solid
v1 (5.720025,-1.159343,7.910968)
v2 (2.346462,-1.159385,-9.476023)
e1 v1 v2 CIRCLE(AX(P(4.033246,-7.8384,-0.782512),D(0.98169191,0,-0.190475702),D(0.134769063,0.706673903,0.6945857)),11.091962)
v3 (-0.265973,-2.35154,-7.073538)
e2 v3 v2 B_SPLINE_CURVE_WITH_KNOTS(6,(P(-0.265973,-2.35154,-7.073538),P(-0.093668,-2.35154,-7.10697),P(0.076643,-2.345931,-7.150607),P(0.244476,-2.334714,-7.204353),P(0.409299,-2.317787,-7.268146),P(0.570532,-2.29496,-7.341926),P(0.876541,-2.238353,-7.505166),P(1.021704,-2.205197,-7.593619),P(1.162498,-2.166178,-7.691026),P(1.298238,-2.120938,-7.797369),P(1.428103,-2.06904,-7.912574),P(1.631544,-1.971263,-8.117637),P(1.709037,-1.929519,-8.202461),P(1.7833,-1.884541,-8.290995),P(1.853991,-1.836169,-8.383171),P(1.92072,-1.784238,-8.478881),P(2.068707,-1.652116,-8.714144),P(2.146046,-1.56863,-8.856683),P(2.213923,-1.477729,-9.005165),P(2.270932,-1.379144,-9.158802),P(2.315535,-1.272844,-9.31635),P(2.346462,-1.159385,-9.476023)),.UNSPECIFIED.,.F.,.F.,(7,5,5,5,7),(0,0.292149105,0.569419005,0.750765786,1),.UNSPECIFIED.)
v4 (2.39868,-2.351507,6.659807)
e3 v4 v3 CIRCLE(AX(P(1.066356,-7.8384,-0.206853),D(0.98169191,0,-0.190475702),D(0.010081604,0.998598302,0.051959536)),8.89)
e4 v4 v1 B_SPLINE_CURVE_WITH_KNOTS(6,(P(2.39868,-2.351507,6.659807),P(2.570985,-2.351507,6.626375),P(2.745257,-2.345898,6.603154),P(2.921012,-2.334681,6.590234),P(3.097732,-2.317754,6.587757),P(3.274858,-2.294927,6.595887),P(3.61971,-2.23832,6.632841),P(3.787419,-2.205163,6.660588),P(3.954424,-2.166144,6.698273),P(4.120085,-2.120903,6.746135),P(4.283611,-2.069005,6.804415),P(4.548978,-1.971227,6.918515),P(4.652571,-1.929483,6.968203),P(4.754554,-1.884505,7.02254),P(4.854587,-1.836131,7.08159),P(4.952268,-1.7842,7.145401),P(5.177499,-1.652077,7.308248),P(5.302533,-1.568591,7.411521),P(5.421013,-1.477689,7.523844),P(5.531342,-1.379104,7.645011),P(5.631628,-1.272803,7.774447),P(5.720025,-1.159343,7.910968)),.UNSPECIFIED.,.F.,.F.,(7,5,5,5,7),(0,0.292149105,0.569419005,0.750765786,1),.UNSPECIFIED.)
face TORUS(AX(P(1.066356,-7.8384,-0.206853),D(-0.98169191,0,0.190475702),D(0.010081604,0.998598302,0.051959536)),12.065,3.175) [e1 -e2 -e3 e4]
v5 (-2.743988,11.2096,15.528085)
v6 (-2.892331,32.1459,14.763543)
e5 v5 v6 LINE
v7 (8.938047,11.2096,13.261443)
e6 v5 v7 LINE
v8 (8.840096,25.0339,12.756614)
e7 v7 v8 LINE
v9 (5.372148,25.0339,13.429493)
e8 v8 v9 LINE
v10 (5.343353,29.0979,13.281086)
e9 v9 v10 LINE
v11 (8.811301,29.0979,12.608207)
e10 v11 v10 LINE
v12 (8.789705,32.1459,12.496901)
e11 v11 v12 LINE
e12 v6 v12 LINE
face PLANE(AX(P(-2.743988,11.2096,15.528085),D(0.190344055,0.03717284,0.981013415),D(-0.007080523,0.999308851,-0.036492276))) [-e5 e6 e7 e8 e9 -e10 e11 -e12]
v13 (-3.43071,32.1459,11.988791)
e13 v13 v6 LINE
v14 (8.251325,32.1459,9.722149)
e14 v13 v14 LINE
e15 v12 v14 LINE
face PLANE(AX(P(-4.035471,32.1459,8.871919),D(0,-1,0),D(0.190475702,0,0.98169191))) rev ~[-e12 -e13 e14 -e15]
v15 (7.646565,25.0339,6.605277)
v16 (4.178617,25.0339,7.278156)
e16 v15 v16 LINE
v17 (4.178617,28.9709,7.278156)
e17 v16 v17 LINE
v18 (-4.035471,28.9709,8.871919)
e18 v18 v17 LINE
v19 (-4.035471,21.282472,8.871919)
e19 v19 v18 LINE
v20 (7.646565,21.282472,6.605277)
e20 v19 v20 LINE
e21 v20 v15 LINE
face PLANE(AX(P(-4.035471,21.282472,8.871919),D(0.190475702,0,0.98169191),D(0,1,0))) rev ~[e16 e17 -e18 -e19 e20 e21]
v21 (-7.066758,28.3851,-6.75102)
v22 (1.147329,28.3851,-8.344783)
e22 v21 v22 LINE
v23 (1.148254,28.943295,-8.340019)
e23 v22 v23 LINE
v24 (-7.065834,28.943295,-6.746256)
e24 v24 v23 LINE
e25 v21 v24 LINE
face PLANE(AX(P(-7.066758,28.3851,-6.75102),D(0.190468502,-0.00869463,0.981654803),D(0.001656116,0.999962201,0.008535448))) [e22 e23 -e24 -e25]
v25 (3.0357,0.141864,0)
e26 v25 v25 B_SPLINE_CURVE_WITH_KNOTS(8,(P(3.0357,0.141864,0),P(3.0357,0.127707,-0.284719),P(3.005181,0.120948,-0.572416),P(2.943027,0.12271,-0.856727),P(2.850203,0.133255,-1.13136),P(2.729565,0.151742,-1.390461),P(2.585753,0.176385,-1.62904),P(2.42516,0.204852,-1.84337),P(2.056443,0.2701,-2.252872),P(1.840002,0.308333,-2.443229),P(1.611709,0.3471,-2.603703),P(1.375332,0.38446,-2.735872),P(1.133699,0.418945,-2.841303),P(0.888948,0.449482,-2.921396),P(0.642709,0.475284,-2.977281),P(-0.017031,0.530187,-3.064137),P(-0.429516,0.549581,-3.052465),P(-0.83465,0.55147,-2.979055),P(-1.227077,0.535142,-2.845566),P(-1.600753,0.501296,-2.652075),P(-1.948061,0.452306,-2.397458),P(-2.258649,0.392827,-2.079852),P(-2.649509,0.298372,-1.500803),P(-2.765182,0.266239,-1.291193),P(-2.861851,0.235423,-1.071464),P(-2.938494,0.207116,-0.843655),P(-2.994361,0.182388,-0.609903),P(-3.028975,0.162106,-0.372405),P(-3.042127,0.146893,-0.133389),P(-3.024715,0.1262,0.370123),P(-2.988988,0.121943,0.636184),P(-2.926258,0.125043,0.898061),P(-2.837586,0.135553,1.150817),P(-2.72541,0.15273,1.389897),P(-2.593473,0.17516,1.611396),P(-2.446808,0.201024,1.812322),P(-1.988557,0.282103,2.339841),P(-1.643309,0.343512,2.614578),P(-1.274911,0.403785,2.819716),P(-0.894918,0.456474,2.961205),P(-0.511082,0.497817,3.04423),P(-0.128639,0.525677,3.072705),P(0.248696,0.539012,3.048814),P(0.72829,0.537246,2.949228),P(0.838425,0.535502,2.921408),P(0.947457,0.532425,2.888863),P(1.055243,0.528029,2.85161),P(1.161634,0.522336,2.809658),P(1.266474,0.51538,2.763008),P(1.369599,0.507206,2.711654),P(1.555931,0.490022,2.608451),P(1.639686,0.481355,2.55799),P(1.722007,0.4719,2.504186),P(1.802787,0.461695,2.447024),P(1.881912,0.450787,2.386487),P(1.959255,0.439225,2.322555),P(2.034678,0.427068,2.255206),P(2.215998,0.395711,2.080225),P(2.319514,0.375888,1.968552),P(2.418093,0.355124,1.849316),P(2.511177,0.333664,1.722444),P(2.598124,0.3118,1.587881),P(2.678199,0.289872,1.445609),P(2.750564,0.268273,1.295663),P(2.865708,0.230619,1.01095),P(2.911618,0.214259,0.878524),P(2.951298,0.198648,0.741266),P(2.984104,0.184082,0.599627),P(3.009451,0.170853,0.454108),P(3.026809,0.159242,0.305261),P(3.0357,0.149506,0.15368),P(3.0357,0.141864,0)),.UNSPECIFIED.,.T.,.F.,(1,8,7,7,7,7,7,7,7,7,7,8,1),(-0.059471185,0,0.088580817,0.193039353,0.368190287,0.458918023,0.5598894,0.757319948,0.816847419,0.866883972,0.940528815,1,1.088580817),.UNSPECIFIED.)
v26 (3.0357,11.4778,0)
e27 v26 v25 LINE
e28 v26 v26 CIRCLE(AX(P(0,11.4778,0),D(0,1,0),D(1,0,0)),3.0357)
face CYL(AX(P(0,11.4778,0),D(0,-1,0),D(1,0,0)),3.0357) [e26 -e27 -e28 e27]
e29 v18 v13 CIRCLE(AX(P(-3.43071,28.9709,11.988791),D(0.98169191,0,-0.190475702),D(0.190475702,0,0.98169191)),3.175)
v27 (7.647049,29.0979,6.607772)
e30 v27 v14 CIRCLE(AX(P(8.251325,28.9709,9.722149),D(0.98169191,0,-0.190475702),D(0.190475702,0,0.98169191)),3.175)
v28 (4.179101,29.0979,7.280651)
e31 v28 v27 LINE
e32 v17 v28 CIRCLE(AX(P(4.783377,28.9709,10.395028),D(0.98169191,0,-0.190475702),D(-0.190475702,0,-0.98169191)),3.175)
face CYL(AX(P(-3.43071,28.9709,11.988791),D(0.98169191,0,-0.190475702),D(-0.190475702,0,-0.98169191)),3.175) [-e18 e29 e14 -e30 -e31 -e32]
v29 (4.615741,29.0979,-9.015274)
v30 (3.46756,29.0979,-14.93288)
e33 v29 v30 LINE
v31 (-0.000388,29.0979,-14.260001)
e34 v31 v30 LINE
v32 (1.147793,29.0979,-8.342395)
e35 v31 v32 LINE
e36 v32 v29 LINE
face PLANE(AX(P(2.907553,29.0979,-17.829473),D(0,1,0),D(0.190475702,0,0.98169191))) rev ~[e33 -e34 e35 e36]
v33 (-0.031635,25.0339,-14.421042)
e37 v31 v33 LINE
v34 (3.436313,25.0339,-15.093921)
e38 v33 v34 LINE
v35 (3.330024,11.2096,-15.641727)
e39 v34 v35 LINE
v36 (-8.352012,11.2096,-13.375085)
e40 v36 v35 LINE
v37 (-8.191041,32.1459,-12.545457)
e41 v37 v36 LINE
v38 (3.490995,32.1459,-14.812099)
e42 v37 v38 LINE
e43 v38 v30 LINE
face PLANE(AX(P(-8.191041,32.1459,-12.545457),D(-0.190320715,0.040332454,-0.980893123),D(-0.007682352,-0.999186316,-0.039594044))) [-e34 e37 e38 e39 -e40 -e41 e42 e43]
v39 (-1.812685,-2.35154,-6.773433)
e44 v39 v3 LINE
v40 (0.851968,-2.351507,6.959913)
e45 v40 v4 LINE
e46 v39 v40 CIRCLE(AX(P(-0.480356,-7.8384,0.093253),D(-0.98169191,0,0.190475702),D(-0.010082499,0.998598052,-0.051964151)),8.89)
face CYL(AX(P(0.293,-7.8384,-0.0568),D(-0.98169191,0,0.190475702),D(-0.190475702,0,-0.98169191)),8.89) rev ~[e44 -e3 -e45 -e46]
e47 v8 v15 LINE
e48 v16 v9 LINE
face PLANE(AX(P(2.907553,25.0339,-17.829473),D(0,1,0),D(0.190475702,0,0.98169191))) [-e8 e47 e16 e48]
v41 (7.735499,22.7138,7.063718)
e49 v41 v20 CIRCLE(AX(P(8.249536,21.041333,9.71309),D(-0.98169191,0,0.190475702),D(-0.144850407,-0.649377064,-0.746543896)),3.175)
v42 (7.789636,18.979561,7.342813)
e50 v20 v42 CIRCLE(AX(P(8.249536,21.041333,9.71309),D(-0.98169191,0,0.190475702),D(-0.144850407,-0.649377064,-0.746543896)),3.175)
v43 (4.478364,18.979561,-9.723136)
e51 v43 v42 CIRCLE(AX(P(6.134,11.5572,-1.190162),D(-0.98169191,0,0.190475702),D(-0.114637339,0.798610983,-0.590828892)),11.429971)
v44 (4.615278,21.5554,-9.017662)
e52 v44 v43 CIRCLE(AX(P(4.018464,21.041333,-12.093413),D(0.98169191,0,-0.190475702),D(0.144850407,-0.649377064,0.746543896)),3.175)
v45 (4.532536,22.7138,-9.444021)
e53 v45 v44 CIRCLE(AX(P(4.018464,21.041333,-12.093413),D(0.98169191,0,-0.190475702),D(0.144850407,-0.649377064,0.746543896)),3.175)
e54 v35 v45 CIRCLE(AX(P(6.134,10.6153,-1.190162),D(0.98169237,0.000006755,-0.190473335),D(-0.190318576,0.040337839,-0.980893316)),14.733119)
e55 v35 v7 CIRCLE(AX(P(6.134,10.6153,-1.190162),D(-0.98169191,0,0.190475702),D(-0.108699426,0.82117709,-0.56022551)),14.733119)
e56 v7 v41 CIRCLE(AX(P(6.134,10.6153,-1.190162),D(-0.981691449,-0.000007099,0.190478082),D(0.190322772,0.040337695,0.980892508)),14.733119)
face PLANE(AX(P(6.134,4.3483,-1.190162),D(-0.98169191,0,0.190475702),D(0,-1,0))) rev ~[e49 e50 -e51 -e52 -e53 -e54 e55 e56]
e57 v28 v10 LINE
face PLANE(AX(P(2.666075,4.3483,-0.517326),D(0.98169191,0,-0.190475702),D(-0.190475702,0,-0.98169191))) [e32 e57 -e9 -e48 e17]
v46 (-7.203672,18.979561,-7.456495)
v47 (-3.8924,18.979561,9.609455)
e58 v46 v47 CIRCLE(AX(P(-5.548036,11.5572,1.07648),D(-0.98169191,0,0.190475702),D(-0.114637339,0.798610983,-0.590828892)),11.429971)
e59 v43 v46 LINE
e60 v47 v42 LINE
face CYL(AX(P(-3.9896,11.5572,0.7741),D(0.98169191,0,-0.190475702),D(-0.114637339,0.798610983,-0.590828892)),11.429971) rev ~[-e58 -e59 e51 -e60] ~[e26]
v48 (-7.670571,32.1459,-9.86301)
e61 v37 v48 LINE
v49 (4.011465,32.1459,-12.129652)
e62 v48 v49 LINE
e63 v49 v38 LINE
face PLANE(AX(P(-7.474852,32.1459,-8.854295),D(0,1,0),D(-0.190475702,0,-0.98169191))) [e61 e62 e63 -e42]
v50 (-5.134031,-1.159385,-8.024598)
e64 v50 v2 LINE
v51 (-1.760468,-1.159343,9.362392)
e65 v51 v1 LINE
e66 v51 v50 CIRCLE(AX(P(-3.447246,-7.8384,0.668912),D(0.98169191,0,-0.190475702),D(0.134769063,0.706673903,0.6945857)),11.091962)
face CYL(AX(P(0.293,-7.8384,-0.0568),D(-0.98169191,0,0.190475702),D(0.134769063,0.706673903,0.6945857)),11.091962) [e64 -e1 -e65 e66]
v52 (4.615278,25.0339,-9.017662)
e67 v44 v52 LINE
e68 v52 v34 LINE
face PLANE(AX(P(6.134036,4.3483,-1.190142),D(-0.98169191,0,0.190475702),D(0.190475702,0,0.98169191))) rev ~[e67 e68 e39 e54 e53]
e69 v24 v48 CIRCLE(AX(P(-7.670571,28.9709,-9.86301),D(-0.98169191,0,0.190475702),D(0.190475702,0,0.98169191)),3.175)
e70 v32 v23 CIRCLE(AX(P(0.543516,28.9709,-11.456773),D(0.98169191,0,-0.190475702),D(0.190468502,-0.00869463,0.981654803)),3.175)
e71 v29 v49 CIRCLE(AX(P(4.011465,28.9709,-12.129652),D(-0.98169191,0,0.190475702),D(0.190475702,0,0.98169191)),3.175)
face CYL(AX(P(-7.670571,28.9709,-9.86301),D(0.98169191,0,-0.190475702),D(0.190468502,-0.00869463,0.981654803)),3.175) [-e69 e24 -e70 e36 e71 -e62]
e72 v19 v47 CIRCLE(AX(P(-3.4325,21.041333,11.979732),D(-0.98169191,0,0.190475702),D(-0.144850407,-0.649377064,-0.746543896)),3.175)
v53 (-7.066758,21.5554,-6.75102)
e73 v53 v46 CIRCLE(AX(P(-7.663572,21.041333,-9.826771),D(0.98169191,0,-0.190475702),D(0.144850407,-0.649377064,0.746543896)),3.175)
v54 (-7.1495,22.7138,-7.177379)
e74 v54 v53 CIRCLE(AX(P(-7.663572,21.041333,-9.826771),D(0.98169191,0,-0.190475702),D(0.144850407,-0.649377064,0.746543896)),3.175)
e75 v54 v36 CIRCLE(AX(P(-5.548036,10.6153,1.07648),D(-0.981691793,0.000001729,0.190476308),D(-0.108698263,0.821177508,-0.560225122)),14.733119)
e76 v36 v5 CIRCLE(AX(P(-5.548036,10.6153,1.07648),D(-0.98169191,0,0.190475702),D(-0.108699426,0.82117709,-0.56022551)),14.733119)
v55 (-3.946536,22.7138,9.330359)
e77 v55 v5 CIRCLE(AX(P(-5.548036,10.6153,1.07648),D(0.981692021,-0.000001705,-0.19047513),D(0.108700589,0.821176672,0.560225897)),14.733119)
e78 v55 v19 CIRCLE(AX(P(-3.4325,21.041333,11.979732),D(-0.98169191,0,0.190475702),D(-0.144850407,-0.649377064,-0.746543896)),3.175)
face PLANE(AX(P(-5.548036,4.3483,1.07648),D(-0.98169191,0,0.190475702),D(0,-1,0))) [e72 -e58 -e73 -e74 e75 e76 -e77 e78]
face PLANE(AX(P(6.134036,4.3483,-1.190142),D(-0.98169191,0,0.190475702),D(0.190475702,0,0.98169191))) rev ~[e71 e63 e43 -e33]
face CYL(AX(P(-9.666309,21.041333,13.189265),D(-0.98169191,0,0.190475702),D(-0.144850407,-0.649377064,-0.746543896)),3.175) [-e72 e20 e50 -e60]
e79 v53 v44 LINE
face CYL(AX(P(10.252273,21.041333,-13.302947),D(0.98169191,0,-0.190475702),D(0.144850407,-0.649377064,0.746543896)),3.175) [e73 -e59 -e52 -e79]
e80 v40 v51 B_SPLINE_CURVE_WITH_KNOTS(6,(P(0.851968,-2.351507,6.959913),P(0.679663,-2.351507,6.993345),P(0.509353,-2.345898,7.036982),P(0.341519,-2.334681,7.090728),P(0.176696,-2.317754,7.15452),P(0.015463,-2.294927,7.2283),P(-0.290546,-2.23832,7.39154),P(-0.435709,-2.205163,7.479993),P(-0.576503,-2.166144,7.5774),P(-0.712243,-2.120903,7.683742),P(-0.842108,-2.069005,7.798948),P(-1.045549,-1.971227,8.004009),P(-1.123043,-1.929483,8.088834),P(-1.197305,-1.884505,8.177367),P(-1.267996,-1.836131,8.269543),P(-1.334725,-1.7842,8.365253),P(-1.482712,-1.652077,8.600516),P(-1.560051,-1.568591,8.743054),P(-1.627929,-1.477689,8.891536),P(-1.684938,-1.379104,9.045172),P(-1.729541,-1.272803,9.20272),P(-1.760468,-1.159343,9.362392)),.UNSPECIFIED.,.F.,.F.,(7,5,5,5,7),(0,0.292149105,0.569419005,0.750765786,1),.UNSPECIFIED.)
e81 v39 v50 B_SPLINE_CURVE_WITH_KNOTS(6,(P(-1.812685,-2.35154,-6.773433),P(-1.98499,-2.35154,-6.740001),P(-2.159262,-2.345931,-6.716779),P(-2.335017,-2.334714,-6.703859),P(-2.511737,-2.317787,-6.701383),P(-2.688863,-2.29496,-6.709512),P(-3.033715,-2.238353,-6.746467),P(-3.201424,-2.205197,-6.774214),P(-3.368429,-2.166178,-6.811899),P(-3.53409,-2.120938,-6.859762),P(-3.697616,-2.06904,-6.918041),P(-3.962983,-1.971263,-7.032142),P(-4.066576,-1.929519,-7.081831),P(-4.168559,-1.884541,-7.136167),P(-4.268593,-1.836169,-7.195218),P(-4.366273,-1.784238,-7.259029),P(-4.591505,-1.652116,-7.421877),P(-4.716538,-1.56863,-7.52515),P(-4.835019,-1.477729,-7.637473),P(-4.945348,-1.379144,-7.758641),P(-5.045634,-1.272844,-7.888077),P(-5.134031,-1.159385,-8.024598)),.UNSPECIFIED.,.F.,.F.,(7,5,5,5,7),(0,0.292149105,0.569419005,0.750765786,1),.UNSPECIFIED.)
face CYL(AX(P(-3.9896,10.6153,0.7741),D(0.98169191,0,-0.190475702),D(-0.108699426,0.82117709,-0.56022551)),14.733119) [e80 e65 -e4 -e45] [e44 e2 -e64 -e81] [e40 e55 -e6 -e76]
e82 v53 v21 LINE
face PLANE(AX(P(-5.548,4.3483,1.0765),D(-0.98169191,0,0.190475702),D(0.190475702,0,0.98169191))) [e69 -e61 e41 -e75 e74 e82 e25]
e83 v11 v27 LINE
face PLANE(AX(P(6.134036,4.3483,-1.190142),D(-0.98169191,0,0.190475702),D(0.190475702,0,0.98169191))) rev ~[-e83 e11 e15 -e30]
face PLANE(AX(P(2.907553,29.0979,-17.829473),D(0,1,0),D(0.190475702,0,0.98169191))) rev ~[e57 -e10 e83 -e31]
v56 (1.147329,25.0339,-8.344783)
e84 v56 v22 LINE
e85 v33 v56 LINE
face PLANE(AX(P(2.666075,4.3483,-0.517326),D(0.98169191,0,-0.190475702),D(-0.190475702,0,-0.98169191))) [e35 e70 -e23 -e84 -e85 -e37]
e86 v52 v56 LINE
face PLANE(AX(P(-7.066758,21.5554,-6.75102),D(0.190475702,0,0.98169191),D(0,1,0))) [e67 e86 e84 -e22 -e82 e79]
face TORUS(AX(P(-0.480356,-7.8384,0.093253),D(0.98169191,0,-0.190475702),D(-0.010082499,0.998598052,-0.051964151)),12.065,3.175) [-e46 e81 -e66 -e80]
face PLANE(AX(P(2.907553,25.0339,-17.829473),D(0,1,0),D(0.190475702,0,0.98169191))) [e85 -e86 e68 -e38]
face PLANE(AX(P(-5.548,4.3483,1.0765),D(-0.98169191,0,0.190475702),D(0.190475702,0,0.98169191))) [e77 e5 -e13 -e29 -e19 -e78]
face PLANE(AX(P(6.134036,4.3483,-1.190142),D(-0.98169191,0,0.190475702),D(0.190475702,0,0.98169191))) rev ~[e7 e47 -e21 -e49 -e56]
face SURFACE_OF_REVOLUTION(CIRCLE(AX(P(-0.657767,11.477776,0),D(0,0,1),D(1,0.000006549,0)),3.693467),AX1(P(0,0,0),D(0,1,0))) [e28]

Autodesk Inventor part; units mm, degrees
ref_plane "YZ Plane" through (0, 0, 0) normal (1, 0, 0) x (0, 1, 0)
sketch "Sketch1" plane through (0, 0, 0) normal (0, 0, 1) x (1, 0, 0)
  line L0 (0, 0) -> (0, 15.1122)
  line L1 (3.0357, 11.4778) -> (3.0357, 0)
  line L2 (3.0357, 0) -> (0, 0)
  arc A0 (3.0357, 11.4778) -> (0, 15.1122) centre (-0.6577, 11.4778) ccw
ref_plane "Work Plane3" through (0, 17.8837, 0) normal (0, 1, 0) x (1, 0, 0)
ref_plane "Work Plane1" through (-3.9896, 4.3483, 0.7741) normal (-0.9816919, 0, 0.1904757) x (0, -1, 0)
sketch "Sketch3" plane through (-3.9896, 4.3483, 0.7741) normal (-0.9816919, 0, 0.1904757) x (0, -1, 0)
  arc A0 (-16.337, -6.8791) -> (-16.337, 6.8791) centre (-7.2089, 0) ccw
  line L0 (-13.5354, -0.5887) -> (0.7521, -0.5887) projected
  line L1 (-13.5354, 0.6171) -> (0.7521, 0.6171) projected
  line L2 (-7.2089, 0) -> (-7.9901, -0.5887)
  line L3 (-16.337, -6.8791) -> (-18.3655, -8.4078)
  line L4 (-7.2089, 0) -> (-8.0277, 0.6171)
  line L5 (-16.337, 6.8791) -> (-18.3655, 8.4078)
  arc A1 (-18.3655, -8.4078) -> (-18.3655, 8.4078) centre (-6.267, 0) ccw
extrude "Extrusion2" add sketch "Sketch3" along normal blind 1.5875 and the other way blind 10.3124
fillet "Fillet1" radius 3.175 2 edges at (-1.0173, 20.6854, -6.81) (1.6033, 20.6854, 6.6963)
ref_plane "Work Plane2" through (0.293, 4.3483, -0.0568) normal (0.9816919, 0, -0.1904757) x (-0.1904757, 0, -0.9816919)
sketch "Sketch4" plane through (0.293, 4.3483, -0.0568) normal (0.9816919, 0, -0.1904757) x (-0.1904757, 0, -0.9816919)
  circle A0 centre (0, -12.1867) radius 8.89
  arc A1 (-8.4078, 18.3655) -> (8.4078, 18.3655) centre (0, 7.2089) ccw projected
  arc A2 (-7.848, -4.3483) -> (7.848, -4.3483) centre (0, -12.1867) ccw
  point P0 (0, -4.3483)
  point P1 (5.8384, -5.4826)
  point P2 (-5.8384, -5.4826)
  dimension "d17" = 17.78
extrude "Extrusion3" add sketch "Sketch4" along normal mid plane 7.62 contours A0 A1 A2
fillet "Fillet2" radius 3.175 2 edges at (-3.4473, -16.7283, 0.6689) (4.0332, -16.7283, -0.7826)
sketch "Sketch5" plane through (-5.548, 4.3483, 1.0765) normal (-0.9816919, 0, 0.1904757) x (0.1904757, 0, 0.9816919)
  arc A0 (-8.6921, 14.6313) -> (-8.4078, 18.3655) centre (-11.1066, 16.6931) ccw
  line L0 (-7.9735, 17.2071) -> (-7.9735, 24.0368)
  line L1 (-10.116, 16.8437) -> (-10.116, 16.3667)
  arc A1 (8.4078, 18.3655) -> (8.6921, 14.6313) centre (11.1066, 16.6931) ccw
  line L2 (7.9735, 17.2071) -> (7.9735, 24.0368)
  line L3 (10.0556, 16.9067) -> (10.0556, 16.0648)
  line L4 (-8.0331, 17.1837) -> (-7.9735, 17.2071)
  line L5 (-7.9735, 24.0368) -> (-7.9408, 27.7976)
  line L6 (-10.116, 27.7976) -> (-7.9408, 27.7976)
  line L7 (7.9408, 27.7976) -> (10.0556, 27.7976)
  arc A2 (-8.4078, 18.3655) -> (8.4078, 18.3655) centre (0, 7.2089) ccw
  line L8 (7.9408, 27.7976) -> (13.9423, 27.7976)
  line L9 (13.9423, 27.7976) -> (13.9423, 6.3292)
  line L10 (13.9423, 6.3292) -> (13.9416, 6.3292)
  line L11 (7.9408, 16.452) -> (7.9408, 27.7976)
  line L12 (-7.9408, 27.7976) -> (-13.876, 27.7976)
  line L13 (-13.876, 27.7976) -> (-13.876, 6.3292)
  line L14 (-7.9408, 16.452) -> (-7.9408, 27.7976)
  arc A3 (13.9421, 6.3267) -> (7.9408, 16.452) centre (-4.3172, 2.3454) ccw
  arc A4 (-7.9408, 16.452) -> (-13.876, 6.3292) centre (3.6251, 2.8693) ccw
  line L15 (-8.1275, 6.3292) -> (-7.9408, 6.3292)
  line L16 (-13.876, 6.3292) -> (-13.876, -0.5906) construction
  line L17 (-13.876, -0.5906) -> (-10.116, -4.3483) construction
  arc A5 (-6.9947, -6.6998) -> (6.9947, -6.6998) centre (0, -12.1867) ccw
  line L18 (-10.116, -4.3483) -> (-7.0424, -6.7611) construction
  line L19 (-7.0424, -6.7611) -> (0, -8.3144) construction
  line L20 (0, -8.3144) -> (5.2825, -7.1493) construction
  line L21 (13.9421, 5.8129) -> (13.9421, 6.3267) construction
  arc A6 (10.0377, -3.7332) -> (10.431, -3.4046) centre (1.9746, 6.3181) ccw
  spline S0 degree 4 poles (-13.876, 6.3292) (-13.876, -0.5906) (-10.116, -4.3483) (-7.0424, -6.7611) (0, -8.3144) (5.2825, -7.1493) (8.5532, -4.7704) (10.0372, -3.7336) (10.0377, -3.7332) knots 1 1 1 1 1 2 3 4 5 5.000386 5.000386 5.000386 5.000386 5.000386
  spline S1 degree 4 poles (13.9158, 4.457) (13.9287, 4.8802) (13.9376, 5.3315) (13.9421, 5.8129) (13.9421, 6.3267) knots 0 0 0 0 0 1 1 1 1 1
  line L22 (5.2825, -7.1493) -> (8.5532, -4.7704) construction
  line L23 (8.5532, -4.7704) -> (10.0372, -3.7336) construction
  line L24 (10.0372, -3.7336) -> (10.0377, -3.7332) construction
  arc A7 (10.431, -3.4046) -> (13.9421, 6.3267) centre (0.7781, 5.5773) ccw
  line L25 (13.9158, 4.457) -> (13.9287, 4.8802) construction
  line L26 (13.9287, 4.8802) -> (13.9376, 5.3315) construction
  line L27 (13.9376, 5.3315) -> (13.9421, 5.8129) construction
  point P0 (0, -4.3483)
  point P1 (10.0556, 24.2784)
  point P2 (7.9735, 31.5584)
  point P3 (-7.9735, 31.5584)
  point P4 (-10.116, 31.5584)
  point P5 (-10.116, 27.7976)
  point P6 (-13.876, 8.8266)
  point P7 (7.9408, 16.9341)
  point P8 (13.9423, 8.0887)
  point P9 (10.0556, 27.7976)
  point P10 (5.8384, -5.4826)
  point P11 (-5.8384, -5.4826)
sketch "Sketch6" plane through (-5.548, 4.3483, 1.0765) normal (-0.9816919, 0, 0.1904757) x (0.1904757, 0, 0.9816919)
  point P0 (0, -4.3483)
revolve "Revolution3" add sketch "Sketch1" angle 360 about axis through (0, 0, 0) along (0, 1, 0)
extrude "Extrusion7" add sketch "Sketch5" against normal up to surface (11.8999 mm away) contours A0 A2 L13 L12 L6 L5 L0 | A2 A1 L11 L7 L8 L9
fillet "Fillet4" radius 3.175 2 edges at (-1.2195, 32.1459, -7.8522) (1.8055, 32.1459, 7.7386)
sketch "Sketch9" plane through (-5.548, 4.3483, 1.0765) normal (-0.9816919, 0, 0.1904757) x (0.1904757, 0, 0.9816919)
  line L0 (-13.876, 11.2188) -> (-13.876, 27.7976) projected
  line L1 (-13.876, 27.7976) -> (-14.7211, 6.8613)
  arc A0 (-13.876, 11.2188) -> (13.9423, 11.0291) centre (0, 6.267) ccw projected
  line L2 (14.7211, 6.8613) -> (13.9423, 27.7976)
  line L3 (-13.876, 27.7976) -> (-11.1435, 27.7976) projected
  line L4 (-13.876, 27.7976) -> (-12.5098, 7.6225)
  line L5 (-12.5098, 7.6225) -> (-14.7211, 6.8613)
  line L6 (14.7211, 6.8613) -> (11.1518, 18.0483)
  line L7 (13.9423, 27.7976) -> (13.9423, 11.0291) projected
  line L8 (11.1518, 18.0483) -> (13.9423, 27.7976)
  point P0 (0, -4.3483)
extrude "Extrusion10" add sketch "Sketch9" against normal up to surface (11.8999 mm away) contours A0 L1 L0 | A0 L7 L2
sketch "Sketch11" plane through (6.134, 4.3483, -1.1902) normal (0.9816919, 0, -0.1904757) x (-0.1904757, 0, -0.9816919)
  line L0 (-13.9423, 27.7976) -> (-14.7211, 6.8613) projected
  line L1 (16.9492, 20.6856) -> (16.9492, 24.7496)
  line L2 (16.9492, 24.7496) -> (-14.3317, 24.7496)
  line L3 (-14.3317, 24.7496) -> (-14.3317, 20.6856)
  line L4 (13.876, 27.7976) -> (11.1435, 27.7976) projected
  line L5 (16.9492, 20.6856) -> (-14.3317, 20.6856)
  point P0 (0, -4.3483)
  point P1 (-14.3317, 17.3294)
  point P2 (-14.0557, 24.7496)
  point P3 (12.5098, 27.7976)
  point P4 (-14.2068, 20.6856)
  dimension "d55" = 3.048
  dimension "d56" = 7.112
sketch "Sketch12" plane through (6.134, 4.3483, -1.1902) normal (0.9816919, 0, -0.1904757) x (-0.1904757, 0, -0.9816919)
  point P0 (0, -4.3483)
extrude "Extrusion13" cut sketch "Sketch11" against normal blind 3.5306
properties part number "Clip13"
